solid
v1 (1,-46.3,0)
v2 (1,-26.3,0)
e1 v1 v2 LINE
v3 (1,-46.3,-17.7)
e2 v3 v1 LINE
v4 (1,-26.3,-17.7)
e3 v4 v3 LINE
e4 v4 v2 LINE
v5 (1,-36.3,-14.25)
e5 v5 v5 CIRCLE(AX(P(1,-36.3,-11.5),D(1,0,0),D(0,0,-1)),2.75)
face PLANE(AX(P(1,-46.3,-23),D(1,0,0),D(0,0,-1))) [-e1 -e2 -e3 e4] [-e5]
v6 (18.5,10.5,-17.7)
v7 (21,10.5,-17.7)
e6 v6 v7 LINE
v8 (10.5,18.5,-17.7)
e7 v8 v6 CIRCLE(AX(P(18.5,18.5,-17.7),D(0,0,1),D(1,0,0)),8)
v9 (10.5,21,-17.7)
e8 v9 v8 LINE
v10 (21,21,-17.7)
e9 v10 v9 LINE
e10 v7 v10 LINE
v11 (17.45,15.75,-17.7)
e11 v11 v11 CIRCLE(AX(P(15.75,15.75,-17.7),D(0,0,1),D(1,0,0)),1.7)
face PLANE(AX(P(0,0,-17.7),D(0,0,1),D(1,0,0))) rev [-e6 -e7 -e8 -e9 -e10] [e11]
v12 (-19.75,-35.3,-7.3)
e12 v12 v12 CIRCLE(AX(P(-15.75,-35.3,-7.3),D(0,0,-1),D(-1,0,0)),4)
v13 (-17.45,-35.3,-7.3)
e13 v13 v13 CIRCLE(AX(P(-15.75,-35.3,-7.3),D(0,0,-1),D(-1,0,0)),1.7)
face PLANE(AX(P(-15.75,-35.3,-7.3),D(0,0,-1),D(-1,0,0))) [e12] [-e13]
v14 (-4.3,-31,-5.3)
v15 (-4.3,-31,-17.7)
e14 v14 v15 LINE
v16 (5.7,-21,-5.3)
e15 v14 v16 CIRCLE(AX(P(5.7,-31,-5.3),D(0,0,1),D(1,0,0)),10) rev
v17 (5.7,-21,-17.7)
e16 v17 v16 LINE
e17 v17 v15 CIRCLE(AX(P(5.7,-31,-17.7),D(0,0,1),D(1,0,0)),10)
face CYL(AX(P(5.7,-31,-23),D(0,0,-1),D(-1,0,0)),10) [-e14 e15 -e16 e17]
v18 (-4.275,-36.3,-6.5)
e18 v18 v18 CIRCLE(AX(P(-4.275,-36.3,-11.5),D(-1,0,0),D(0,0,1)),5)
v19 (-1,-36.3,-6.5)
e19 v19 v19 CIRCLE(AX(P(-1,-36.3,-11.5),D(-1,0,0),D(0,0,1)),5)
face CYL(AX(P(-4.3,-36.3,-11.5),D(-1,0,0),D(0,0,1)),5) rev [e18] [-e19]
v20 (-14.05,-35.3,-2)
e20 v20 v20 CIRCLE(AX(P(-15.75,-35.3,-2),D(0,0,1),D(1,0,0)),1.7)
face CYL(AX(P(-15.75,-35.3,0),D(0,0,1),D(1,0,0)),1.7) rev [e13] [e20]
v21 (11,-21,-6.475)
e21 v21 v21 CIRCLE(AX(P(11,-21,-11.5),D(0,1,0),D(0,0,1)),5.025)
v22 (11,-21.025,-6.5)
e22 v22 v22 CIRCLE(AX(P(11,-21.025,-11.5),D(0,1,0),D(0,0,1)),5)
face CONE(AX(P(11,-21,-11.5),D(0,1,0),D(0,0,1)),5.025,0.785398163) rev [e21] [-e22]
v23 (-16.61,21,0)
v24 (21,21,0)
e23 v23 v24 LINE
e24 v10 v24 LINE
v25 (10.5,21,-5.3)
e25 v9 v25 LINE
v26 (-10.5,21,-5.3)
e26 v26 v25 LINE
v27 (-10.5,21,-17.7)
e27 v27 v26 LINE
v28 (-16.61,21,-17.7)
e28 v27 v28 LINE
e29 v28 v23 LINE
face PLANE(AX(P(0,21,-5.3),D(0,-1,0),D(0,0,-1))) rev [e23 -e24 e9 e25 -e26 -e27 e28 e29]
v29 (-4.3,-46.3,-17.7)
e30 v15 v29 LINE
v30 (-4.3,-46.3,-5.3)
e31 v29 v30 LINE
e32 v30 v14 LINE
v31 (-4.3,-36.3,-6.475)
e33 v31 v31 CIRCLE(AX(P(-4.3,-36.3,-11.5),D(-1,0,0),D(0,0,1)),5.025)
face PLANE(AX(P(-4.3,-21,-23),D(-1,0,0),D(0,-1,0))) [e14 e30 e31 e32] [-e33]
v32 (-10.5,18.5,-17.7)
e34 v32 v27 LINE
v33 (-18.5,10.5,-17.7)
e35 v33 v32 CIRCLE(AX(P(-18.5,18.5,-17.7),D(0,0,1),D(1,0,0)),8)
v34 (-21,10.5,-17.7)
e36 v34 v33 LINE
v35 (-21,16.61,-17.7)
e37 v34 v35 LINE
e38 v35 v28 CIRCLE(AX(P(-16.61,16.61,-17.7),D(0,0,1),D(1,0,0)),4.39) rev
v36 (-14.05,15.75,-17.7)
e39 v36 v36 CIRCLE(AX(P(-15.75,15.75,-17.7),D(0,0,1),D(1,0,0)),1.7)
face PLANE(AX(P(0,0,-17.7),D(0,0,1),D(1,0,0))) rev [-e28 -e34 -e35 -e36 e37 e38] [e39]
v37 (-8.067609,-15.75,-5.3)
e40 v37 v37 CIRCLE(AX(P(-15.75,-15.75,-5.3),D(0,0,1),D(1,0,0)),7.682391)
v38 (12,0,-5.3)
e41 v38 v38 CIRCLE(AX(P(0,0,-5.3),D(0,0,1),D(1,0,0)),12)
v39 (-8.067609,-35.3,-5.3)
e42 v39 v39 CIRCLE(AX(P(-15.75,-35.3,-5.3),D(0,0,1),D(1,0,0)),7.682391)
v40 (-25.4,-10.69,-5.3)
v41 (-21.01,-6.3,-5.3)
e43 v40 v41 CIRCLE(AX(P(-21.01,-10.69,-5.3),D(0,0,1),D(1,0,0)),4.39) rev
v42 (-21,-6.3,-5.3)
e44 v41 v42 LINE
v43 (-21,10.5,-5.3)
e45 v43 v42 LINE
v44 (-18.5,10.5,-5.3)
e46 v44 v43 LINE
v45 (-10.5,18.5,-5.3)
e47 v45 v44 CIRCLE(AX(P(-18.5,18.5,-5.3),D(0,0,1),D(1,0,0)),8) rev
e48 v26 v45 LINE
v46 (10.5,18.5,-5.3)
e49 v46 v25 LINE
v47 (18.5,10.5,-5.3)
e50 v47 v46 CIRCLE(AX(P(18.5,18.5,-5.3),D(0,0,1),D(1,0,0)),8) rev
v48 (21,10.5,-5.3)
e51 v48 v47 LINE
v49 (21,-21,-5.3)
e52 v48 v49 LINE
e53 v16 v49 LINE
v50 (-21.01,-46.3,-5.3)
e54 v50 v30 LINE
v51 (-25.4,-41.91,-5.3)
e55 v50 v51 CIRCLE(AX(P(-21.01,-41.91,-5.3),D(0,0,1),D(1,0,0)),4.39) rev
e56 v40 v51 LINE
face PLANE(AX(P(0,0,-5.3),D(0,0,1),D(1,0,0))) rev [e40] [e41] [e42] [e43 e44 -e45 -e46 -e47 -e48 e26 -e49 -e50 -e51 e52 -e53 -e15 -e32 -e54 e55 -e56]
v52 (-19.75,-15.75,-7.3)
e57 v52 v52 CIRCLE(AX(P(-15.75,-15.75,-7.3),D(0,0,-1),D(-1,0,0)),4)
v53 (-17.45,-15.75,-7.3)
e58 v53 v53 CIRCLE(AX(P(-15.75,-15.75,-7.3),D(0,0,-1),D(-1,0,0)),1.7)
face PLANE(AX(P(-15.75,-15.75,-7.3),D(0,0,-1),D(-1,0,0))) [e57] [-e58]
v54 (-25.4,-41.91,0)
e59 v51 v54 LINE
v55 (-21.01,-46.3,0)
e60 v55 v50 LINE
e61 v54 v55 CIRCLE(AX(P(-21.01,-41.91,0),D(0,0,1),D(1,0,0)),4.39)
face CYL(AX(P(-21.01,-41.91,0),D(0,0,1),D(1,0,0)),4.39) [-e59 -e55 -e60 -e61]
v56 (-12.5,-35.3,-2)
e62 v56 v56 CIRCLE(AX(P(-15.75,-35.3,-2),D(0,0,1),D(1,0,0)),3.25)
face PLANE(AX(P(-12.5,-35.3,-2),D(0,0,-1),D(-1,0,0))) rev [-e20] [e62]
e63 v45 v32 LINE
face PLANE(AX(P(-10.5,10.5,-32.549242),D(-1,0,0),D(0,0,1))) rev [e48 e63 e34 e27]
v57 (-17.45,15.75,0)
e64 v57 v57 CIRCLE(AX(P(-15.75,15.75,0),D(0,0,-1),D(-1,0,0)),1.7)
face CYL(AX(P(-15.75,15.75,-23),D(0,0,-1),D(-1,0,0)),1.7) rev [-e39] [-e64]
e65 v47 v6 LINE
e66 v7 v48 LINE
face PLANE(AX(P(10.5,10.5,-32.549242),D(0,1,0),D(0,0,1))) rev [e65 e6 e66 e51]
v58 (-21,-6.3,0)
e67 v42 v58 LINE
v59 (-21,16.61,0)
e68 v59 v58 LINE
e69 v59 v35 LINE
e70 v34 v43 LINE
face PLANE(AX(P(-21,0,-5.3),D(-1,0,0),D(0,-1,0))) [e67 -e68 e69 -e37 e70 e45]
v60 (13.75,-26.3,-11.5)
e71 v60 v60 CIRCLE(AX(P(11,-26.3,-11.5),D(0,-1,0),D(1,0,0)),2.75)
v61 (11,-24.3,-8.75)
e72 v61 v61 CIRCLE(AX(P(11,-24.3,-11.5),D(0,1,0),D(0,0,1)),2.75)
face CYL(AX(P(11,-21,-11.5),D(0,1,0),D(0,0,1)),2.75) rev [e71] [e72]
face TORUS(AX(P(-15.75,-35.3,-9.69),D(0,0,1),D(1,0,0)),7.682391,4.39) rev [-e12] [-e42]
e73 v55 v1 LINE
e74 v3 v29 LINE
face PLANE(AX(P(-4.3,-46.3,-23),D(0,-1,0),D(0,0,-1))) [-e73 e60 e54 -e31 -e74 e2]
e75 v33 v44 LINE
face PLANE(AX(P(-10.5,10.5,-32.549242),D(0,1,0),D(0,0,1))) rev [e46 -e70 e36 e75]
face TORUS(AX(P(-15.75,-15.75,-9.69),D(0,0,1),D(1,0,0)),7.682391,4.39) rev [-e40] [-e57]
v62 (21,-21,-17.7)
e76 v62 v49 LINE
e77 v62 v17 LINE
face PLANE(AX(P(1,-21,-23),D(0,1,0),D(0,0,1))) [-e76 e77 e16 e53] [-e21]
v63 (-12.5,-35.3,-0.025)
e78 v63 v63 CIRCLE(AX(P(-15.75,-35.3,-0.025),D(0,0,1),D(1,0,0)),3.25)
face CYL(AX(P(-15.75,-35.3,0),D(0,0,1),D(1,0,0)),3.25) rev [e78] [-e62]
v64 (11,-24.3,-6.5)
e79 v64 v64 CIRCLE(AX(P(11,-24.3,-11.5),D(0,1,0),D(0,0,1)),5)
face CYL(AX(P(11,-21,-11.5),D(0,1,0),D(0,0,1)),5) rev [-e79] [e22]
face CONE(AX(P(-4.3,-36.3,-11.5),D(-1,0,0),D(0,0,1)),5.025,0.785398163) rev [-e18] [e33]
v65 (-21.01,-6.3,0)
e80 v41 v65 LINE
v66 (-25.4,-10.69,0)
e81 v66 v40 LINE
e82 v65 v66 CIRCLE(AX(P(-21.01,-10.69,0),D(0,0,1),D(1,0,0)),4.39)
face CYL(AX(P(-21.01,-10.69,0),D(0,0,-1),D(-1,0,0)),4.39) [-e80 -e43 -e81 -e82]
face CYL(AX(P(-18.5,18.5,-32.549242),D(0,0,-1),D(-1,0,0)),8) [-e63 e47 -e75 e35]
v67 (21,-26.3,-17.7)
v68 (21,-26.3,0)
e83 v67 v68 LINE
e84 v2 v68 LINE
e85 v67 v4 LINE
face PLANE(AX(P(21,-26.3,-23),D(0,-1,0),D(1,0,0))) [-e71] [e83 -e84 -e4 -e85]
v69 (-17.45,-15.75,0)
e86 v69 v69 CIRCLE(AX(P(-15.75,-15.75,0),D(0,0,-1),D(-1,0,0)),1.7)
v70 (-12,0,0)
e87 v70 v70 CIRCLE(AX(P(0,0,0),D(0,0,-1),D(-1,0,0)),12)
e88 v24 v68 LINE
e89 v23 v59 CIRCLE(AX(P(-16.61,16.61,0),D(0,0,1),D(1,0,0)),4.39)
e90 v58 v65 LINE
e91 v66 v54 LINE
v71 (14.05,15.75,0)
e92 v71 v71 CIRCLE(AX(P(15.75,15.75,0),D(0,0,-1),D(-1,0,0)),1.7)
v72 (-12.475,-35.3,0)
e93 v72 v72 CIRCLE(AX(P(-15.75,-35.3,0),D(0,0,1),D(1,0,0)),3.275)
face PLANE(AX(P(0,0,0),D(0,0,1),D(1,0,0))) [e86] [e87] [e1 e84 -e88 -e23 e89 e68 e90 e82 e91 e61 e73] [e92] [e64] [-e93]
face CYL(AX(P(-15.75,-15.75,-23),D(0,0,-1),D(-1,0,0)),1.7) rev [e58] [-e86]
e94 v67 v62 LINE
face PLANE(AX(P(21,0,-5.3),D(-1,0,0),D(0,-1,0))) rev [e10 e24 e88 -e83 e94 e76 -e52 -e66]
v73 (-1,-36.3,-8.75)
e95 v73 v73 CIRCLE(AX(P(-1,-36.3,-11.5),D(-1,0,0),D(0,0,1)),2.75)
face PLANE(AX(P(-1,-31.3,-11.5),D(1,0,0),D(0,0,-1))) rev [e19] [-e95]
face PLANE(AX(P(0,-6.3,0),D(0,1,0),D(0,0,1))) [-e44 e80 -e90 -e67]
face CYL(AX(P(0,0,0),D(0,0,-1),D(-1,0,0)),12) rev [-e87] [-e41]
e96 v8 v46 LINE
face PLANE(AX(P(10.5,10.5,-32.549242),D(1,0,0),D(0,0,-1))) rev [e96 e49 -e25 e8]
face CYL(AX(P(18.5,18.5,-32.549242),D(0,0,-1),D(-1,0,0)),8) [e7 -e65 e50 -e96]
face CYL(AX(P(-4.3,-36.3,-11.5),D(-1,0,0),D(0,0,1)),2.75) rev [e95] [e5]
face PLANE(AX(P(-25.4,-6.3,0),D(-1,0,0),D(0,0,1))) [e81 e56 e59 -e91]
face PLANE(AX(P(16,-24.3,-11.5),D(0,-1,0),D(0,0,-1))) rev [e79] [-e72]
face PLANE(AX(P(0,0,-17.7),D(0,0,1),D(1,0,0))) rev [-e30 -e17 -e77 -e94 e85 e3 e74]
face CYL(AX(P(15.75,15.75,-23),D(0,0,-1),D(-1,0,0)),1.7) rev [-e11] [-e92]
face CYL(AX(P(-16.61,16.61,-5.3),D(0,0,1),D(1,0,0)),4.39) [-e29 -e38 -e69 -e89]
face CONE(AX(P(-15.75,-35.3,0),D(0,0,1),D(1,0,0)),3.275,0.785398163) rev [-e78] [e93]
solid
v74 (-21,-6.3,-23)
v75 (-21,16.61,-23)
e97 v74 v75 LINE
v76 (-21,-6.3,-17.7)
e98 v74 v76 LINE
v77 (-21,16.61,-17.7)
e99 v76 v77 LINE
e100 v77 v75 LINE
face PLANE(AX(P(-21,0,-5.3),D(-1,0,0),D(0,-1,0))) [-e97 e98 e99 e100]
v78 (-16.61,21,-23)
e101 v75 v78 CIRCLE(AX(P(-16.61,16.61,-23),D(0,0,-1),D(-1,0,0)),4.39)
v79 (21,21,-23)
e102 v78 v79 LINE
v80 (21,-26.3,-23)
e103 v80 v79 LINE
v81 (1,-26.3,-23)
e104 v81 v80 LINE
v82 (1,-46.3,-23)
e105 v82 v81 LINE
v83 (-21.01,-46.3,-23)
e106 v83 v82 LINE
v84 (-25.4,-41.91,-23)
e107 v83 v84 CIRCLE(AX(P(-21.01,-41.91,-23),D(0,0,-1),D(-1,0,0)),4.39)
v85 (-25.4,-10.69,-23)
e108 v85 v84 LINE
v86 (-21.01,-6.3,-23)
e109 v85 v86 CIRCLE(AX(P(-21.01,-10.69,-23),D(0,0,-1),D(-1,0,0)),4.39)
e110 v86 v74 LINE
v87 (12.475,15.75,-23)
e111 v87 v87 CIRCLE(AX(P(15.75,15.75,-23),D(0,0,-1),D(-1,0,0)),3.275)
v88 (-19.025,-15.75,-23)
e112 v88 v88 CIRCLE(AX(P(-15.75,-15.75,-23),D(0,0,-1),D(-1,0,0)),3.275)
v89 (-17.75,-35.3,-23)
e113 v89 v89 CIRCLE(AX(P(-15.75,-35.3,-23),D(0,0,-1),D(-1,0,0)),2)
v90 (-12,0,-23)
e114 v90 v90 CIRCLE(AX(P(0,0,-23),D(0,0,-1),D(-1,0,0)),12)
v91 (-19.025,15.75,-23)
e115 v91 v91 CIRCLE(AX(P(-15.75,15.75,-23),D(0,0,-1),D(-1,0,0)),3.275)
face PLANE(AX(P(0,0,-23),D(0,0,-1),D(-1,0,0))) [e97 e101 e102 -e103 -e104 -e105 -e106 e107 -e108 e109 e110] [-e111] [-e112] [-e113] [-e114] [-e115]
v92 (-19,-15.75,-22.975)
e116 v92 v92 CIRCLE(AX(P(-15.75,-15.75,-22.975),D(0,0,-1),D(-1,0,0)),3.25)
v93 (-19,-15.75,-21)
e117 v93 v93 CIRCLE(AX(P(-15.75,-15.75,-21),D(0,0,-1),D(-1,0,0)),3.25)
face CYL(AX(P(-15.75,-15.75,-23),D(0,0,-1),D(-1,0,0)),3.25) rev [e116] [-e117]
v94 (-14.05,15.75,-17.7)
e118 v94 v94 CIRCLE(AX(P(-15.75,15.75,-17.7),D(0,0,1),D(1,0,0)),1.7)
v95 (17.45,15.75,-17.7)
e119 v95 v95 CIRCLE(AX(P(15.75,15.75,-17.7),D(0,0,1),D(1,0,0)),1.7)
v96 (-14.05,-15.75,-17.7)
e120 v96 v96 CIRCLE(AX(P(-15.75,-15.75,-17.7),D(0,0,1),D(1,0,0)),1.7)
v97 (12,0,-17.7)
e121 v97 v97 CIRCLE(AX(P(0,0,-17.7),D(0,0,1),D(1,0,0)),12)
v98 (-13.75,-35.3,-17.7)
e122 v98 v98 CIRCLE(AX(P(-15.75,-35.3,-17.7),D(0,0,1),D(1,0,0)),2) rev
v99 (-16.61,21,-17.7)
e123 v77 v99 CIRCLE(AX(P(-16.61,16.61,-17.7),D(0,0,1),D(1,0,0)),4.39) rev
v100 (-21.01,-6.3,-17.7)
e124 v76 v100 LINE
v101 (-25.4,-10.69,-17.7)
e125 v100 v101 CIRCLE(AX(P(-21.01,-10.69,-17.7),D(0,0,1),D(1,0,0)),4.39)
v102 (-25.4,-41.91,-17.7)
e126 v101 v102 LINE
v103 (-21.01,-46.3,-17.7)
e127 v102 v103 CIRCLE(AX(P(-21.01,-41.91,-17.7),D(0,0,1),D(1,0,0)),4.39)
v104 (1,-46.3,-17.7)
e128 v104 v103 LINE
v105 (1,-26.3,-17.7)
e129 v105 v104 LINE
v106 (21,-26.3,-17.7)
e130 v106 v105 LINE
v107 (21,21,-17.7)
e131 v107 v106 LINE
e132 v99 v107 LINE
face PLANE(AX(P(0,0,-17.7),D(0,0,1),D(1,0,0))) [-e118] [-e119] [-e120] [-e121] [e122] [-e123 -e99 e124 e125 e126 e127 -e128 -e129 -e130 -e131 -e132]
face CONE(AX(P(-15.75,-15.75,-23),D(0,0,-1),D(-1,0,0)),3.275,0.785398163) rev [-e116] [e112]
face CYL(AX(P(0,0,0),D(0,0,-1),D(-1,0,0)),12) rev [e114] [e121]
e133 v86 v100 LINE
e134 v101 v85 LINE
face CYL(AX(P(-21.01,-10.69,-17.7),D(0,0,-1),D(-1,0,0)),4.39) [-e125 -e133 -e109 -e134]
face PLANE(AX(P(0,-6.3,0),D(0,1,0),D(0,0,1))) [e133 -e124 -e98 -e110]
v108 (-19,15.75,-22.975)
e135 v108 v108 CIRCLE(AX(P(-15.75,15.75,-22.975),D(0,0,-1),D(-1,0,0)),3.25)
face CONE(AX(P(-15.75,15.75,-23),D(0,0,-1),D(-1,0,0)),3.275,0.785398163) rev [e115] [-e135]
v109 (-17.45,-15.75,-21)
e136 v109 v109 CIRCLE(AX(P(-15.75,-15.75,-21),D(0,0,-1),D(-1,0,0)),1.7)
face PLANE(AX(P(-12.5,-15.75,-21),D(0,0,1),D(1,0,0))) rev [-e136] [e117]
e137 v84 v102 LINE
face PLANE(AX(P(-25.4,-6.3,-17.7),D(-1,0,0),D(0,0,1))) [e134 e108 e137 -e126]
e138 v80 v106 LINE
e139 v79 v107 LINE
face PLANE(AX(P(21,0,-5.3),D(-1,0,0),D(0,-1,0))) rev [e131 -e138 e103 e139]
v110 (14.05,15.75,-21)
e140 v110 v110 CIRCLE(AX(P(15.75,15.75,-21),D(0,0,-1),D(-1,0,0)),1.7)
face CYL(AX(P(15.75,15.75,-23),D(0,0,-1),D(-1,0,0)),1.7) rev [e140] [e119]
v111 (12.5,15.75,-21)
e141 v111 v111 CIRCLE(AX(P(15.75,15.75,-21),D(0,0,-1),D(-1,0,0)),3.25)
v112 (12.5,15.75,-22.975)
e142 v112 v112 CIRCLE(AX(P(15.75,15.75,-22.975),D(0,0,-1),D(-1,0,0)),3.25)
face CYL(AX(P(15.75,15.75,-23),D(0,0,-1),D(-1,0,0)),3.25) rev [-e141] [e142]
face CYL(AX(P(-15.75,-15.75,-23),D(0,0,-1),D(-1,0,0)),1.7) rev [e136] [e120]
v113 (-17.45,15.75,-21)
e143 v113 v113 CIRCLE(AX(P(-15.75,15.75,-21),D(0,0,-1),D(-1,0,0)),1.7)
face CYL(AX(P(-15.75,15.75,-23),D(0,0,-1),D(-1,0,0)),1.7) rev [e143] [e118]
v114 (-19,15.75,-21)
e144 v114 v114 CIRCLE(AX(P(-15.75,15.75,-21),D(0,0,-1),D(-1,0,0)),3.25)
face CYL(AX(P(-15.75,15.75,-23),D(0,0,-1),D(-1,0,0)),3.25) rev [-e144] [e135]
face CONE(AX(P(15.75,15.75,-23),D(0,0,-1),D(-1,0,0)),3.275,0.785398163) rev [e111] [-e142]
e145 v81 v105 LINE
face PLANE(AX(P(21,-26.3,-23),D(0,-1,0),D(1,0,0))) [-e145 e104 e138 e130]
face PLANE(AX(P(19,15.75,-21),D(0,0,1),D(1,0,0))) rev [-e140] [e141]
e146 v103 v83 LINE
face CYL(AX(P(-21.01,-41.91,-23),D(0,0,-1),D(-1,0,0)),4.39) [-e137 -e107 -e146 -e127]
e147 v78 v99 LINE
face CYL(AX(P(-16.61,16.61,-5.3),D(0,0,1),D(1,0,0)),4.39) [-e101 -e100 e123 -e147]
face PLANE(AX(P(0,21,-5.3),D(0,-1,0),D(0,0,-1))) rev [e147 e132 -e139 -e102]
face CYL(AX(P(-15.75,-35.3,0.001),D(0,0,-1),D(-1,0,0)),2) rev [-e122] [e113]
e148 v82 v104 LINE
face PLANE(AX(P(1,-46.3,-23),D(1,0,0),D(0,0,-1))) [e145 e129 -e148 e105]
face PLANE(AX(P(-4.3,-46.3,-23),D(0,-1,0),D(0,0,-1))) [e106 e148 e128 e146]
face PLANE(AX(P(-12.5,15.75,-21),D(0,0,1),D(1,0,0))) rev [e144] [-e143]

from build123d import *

# Parameters (mm, degrees)
SKETCH16_W                                 = 42
SKETCH16_H                                 = 42
BOSS_EXTRUDE4_DEPTH                        = 5.3
SKETCH19_W                                 = 20
SKETCH19_H                                 = 5.3
BOSS_EXTRUDE7_DEPTH                        = 23
SKETCH20_W                                 = 5.3
SKETCH20_H                                 = 25.3
BOSS_EXTRUDE8_DEPTH                        = 23
SKETCH21_W                                 = 16.7
SKETCH21_H                                 = 5.3
BOSS_EXTRUDE9_DEPTH                        = 25.3
BOSS_EXTRUDE10_DEPTH                       = 5.3
SKETCH27_W                                 = 10.5
SKETCH27_H                                 = 10.5
BOSS_EXTRUDE11_DEPTH                       = 12.4
SKETCH29_W                                 = 4.4
SKETCH29_H                                 = 5.3
BOSS_EXTRUDE12_DEPTH                       = 40
CUT_EXTRUDE2_REACH                         = 59.601
SKETCH38_R                                 = 2
CUT_EXTRUDE3_DEPTH                         = 58.600781245
CUT_EXTRUDE3_DEPTH_BACK                    = 58.600781245
SKETCH39_R                                 = 12
FILLET1_R                                  = 10
FILLET2_R                                  = 8
FILLET3_R                                  = 8
FILLET4_R                                  = 4.39
FILLET5_R                                  = 4.39
FILLET6_R                                  = 4.39
FILLET7_R                                  = 4.39
FILLET8_R                                  = 4.39
SKETCH41_R                                 = 4
BOSS_EXTRUDE13_DEPTH                       = 2
FILLET9_R                                  = 4.39
CBORE_FOR_M3_CHEESE_HEAD_SCREW3_AT_2_COUNT = 2
CBORE_FOR_M3_CHEESE_HEAD_SCREW3_AT_2_PITCH = 31.5
CBORE_FOR_M3_CHEESE_HEAD_SCREW3_AT_3_COUNT = 2
CBORE_FOR_M3_CHEESE_HEAD_SCREW3_AT_3_PITCH = 44.547727215


with BuildPart() as part:
    # Sketch16 → Boss-Extrude4 (new body)
    with BuildSketch(Plane.XY):
        Rectangle(SKETCH16_W, SKETCH16_H)
    extrude(amount=-BOSS_EXTRUDE4_DEPTH)

    # Sketch19 → Boss-Extrude7 (add)
    with BuildSketch(Plane.XY):
        with Locations((11, -23.65)):
            Rectangle(SKETCH19_W, SKETCH19_H)
    extrude(amount=-BOSS_EXTRUDE7_DEPTH)

    # Sketch20 → Boss-Extrude8 (add)
    with BuildSketch(Plane.XY):
        with Locations((-1.65, -33.65)):
            Rectangle(SKETCH20_W, SKETCH20_H)
    extrude(amount=-BOSS_EXTRUDE8_DEPTH)

    # Sketch21 → Boss-Extrude9 (add)
    with BuildSketch(Plane.XZ.offset(21)):
        with Locations((-12.65, -2.65)):
            Rectangle(SKETCH21_W, SKETCH21_H)
    extrude(amount=BOSS_EXTRUDE9_DEPTH)

    # Sketch22 → Boss-Extrude10 (add)
    with BuildSketch(Plane(origin=(0, 0, -23), x_dir=(-1, 0, 0), z_dir=(0, 0, -1))):
        Polygon((-21, -21), (-21, 21), (21, 21), (21, -46.3), (4.3, -46.3), (4.3, -21), align=None)
    extrude(amount=-BOSS_EXTRUDE10_DEPTH)

    # Sketch25 → CBORE for M5 Cheese Head Screw1 (revolve, cut)
    with BuildSketch(Plane(origin=(11, -21, -11.5), x_dir=(0, 0, 1), z_dir=(1, 0, 0))):
        Polygon((0, 0), (0, 5.3), (2.75, 5.3), (2.75, 3.3), (5, 3.3), (5, 0.025), (5.025, 0), align=None)
    revolve(axis=Axis((11, -14.65, -11.5), (0, -1, 0)), mode=Mode.SUBTRACT)

    # Sketch25 at point 2 (carried to point 2, square into its face) → CBORE for M5 Cheese Head Screw1 at 2 (revolve, cut)
    with BuildSketch(Plane(origin=(-4.3, -36.3, -11.5), x_dir=(0, 0, 1), z_dir=(0, 1, 0))):
        Polygon((0, 0), (0, 5.3), (2.75, 5.3), (2.75, 3.3), (5, 3.3), (5, 0.025), (5.025, 0), align=None)
    revolve(axis=Axis((-10.65, -36.3, -11.5), (1, 0, 0)), mode=Mode.SUBTRACT)

    # Sketch27 → Boss-Extrude11 (add)
    with BuildSketch(Plane(origin=(0, 0, -5.3), x_dir=(-1, 0, 0), z_dir=(0, 0, -1))):
        with Locations((15.75, 15.75)):
            Rectangle(SKETCH27_W, SKETCH27_H)
        with Locations((-15.75, 15.75)):
            Rectangle(SKETCH27_W, SKETCH27_H)
    extrude(amount=BOSS_EXTRUDE11_DEPTH)

    # Sketch29 → Boss-Extrude12 (add)
    with BuildSketch(Plane.XZ.offset(46.3)):
        with Locations((-23.2, -2.65)):
            Rectangle(SKETCH29_W, SKETCH29_H)
        with Locations((-23.2, -20.35)):
            Rectangle(SKETCH29_W, SKETCH29_H)
    extrude(amount=-BOSS_EXTRUDE12_DEPTH)

    # Sketch38 → Cut-Extrude2 (cut, up to next)
    with BuildSketch(Plane(origin=(0, 0, -23), x_dir=(-1, 0, 0), z_dir=(0, 0, -1)), mode=Mode.PRIVATE) as cut_extrude2_sk1:
        with Locations((15.75, -35.3)):
            Circle(SKETCH38_R)
    cut_extrude2_tool1 = extrude(cut_extrude2_sk1.sketch, amount=-CUT_EXTRUDE2_REACH, mode=Mode.PRIVATE) & part.part
    add(cut_extrude2_tool1.solids().sort_by_distance((-15.75, -35.3, -23))[0], mode=Mode.SUBTRACT)

    # Sketch39 → Cut-Extrude3 (cut, two sides: drawn at the far end of the back side and taken through both)
    with BuildSketch(Plane(origin=(0, 0, -23), x_dir=(-1, 0, 0), z_dir=(0, 0, -1)).offset(-CUT_EXTRUDE3_DEPTH_BACK)):
        Circle(SKETCH39_R)
    extrude(amount=CUT_EXTRUDE3_DEPTH + CUT_EXTRUDE3_DEPTH_BACK, mode=Mode.SUBTRACT)

    # Fillet1
    fillet1_edges = [part.edges().sort_by_distance(p)[0] for p in [
        (-4.3, -21, -11.5),
    ]]
    fillet(fillet1_edges, radius=FILLET1_R)

    # Fillet2
    fillet2_edges = [part.edges().sort_by_distance(p)[0] for p in [
        (-10.5, 10.5, -11.5),
    ]]
    fillet(fillet2_edges, radius=FILLET2_R)

    # Fillet3
    fillet3_edges = [part.edges().sort_by_distance(p)[0] for p in [
        (10.5, 10.5, -11.5),
    ]]
    fillet(fillet3_edges, radius=FILLET3_R)

    # Fillet4
    fillet4_edges = [part.edges().sort_by_distance(p)[0] for p in [
        (-25.4, -6.3, -2.65),
    ]]
    fillet(fillet4_edges, radius=FILLET4_R)

    # Fillet5
    fillet5_edges = [part.edges().sort_by_distance(p)[0] for p in [
        (-25.4, -46.3, -2.65),
    ]]
    fillet(fillet5_edges, radius=FILLET5_R)

    # Fillet6
    fillet6_edges = [part.edges().sort_by_distance(p)[0] for p in [
        (-25.4, -6.3, -20.35),
    ]]
    fillet(fillet6_edges, radius=FILLET6_R)

    # Fillet7
    fillet7_edges = [part.edges().sort_by_distance(p)[0] for p in [
        (-25.4, -46.3, -20.35),
    ]]
    fillet(fillet7_edges, radius=FILLET7_R)

    # Fillet8
    fillet8_edges = [part.edges().sort_by_distance(p)[0] for p in [
        (-21, 21, -11.5),
    ]]
    fillet(fillet8_edges, radius=FILLET8_R)


with BuildPart() as body_2:
    # Split1: the piece on the far side of the plane
    add(part.part)
    split(bisect_by=Plane.XY.offset(-17.7), keep=Keep.BOTTOM)


with BuildPart() as part_1:
    add(part.part)

    # Split1
    split(bisect_by=Plane.XY.offset(-17.7), keep=Keep.TOP)

    # Sketch41 → Boss-Extrude13 (add)
    with BuildSketch(Plane(origin=(0, 0, -5.3), x_dir=(-1, 0, 0), z_dir=(0, 0, -1))):
        with Locations(Location((15.75, -35.3, 0), (0, 0, 180))):
            Circle(SKETCH41_R)
        with Locations(Location((15.75, -15.75, 0), (0, 0, 180))):
            Circle(SKETCH41_R)
    extrude(amount=BOSS_EXTRUDE13_DEPTH)

    # Fillet9
    # the kernel refuses this fillet: 4.39 mm, written as the material it adds along each edge
    with BuildSketch(Plane(origin=(-15.75, -35.3, -5.3), x_dir=(1, 0, 0), z_dir=(0, 1, 0))) as fillet9_piece_1:
        with BuildLine():
            CenterArc((7.682390528, 4.39), FILLET9_R, 212.984978244, 57.015021756)
            Line((4, 2), (3.926352189, 1.9522))
            ThreePointArc((3.926352189, 1.9522), (3.9122, 1), (3.9122, 0))
            Line((3.9122, 0), (4, -0.0878))
            Line((4, -0.0878), (7.682390528, -0.0878))
            Line((7.682390528, -0.0878), (7.682390528, 0))
        make_face()
    revolve(axis=Axis((-15.75, -35.3, -5.3), (0, 0, -1)))
    with BuildSketch(Plane(origin=(-15.75, -15.75, -5.3), x_dir=(1, 0, 0), z_dir=(0, 1, 0))) as fillet9_piece_2:
        with BuildLine():
            CenterArc((7.682390528, 4.39), FILLET9_R, 212.984978244, 57.015021756)
            Line((4, 2), (3.926352189, 1.9522))
            ThreePointArc((3.926352189, 1.9522), (3.9122, 1), (3.9122, 0))
            Line((3.9122, 0), (4, -0.0878))
            Line((4, -0.0878), (7.682390528, -0.0878))
            Line((7.682390528, -0.0878), (7.682390528, 0))
        make_face()
    revolve(axis=Axis((-15.75, -15.75, -5.3), (0, 0, -1)))


with BuildPart() as cbore_for_m3_cheese_head_screw3_tool:
    # Sketch37 → CBORE for M3 Cheese Head Screw3 (revolve)
    with BuildSketch(Plane(origin=(-15.75, -15.75, -23), x_dir=(0, 1, 0), z_dir=(1, 0, 0))):
        Polygon((0, 0), (0, 23), (1.7, 23), (1.7, 2), (3.25, 2), (3.25, 0.025), (3.275, 0), align=None)
    cbore_for_m3_cheese_head_screw3 = revolve(axis=Axis((-15.75, -15.75, -29.35), (0, 0, 1)))


with BuildPart() as part_2:
    add(part_1.part)

    # CBORE for M3 Cheese Head Screw3: cut by cbore_for_m3_cheese_head_screw3_tool
    add(cbore_for_m3_cheese_head_screw3_tool.part, mode=Mode.SUBTRACT)


with BuildPart() as body_2_1:
    add(body_2.part)

    # CBORE for M3 Cheese Head Screw3: cut by cbore_for_m3_cheese_head_screw3_tool
    add(cbore_for_m3_cheese_head_screw3_tool.part, mode=Mode.SUBTRACT)


with BuildPart() as cbore_for_m3_cheese_head_screw3_at_2_tool:
    # CBORE for M3 Cheese Head Screw3 at 2: CBORE for M3 Cheese Head Screw3 ×2
    with Locations(*[(0, i * CBORE_FOR_M3_CHEESE_HEAD_SCREW3_AT_2_PITCH, 0) for i in range(1, CBORE_FOR_M3_CHEESE_HEAD_SCREW3_AT_2_COUNT)]):
        add(cbore_for_m3_cheese_head_screw3)


with BuildPart() as part_3:
    add(part_2.part)

    # CBORE for M3 Cheese Head Screw3 at 2: cut by cbore_for_m3_cheese_head_screw3_at_2_tool
    add(cbore_for_m3_cheese_head_screw3_at_2_tool.part, mode=Mode.SUBTRACT)


with BuildPart() as body_2_2:
    add(body_2_1.part)

    # CBORE for M3 Cheese Head Screw3 at 2: cut by cbore_for_m3_cheese_head_screw3_at_2_tool
    add(cbore_for_m3_cheese_head_screw3_at_2_tool.part, mode=Mode.SUBTRACT)


with BuildPart() as cbore_for_m3_cheese_head_screw3_at_3_tool:
    # CBORE for M3 Cheese Head Screw3 at 3: CBORE for M3 Cheese Head Screw3 ×2
    with Locations(*[Vector(0.7071067811865475, 0.7071067811865476, 0) * (i * CBORE_FOR_M3_CHEESE_HEAD_SCREW3_AT_3_PITCH) for i in range(1, CBORE_FOR_M3_CHEESE_HEAD_SCREW3_AT_3_COUNT)]):
        add(cbore_for_m3_cheese_head_screw3)


with BuildPart() as part_4:
    add(part_3.part)

    # CBORE for M3 Cheese Head Screw3 at 3: cut by cbore_for_m3_cheese_head_screw3_at_3_tool
    add(cbore_for_m3_cheese_head_screw3_at_3_tool.part, mode=Mode.SUBTRACT)

    # Sketch34 → CBORE for M3 Cheese Head Screw1 (revolve, cut)
    with BuildSketch(Plane(origin=(-15.75, -35.3, 0), x_dir=(0, -1, 0), z_dir=(1, 0, 0))):
        Polygon((0, 0), (0, 23), (1.7, 23), (1.7, 2), (3.25, 2), (3.25, 0.025), (3.275, 0), align=None)
    revolve(axis=Axis((-15.75, -35.3, 6.35), (0, 0, -1)), mode=Mode.SUBTRACT)


with BuildPart() as body_2_3:
    add(body_2_2.part)

    # CBORE for M3 Cheese Head Screw3 at 3: cut by cbore_for_m3_cheese_head_screw3_at_3_tool
    add(cbore_for_m3_cheese_head_screw3_at_3_tool.part, mode=Mode.SUBTRACT)


solid = Compound([part_4.part, body_2_3.part])
